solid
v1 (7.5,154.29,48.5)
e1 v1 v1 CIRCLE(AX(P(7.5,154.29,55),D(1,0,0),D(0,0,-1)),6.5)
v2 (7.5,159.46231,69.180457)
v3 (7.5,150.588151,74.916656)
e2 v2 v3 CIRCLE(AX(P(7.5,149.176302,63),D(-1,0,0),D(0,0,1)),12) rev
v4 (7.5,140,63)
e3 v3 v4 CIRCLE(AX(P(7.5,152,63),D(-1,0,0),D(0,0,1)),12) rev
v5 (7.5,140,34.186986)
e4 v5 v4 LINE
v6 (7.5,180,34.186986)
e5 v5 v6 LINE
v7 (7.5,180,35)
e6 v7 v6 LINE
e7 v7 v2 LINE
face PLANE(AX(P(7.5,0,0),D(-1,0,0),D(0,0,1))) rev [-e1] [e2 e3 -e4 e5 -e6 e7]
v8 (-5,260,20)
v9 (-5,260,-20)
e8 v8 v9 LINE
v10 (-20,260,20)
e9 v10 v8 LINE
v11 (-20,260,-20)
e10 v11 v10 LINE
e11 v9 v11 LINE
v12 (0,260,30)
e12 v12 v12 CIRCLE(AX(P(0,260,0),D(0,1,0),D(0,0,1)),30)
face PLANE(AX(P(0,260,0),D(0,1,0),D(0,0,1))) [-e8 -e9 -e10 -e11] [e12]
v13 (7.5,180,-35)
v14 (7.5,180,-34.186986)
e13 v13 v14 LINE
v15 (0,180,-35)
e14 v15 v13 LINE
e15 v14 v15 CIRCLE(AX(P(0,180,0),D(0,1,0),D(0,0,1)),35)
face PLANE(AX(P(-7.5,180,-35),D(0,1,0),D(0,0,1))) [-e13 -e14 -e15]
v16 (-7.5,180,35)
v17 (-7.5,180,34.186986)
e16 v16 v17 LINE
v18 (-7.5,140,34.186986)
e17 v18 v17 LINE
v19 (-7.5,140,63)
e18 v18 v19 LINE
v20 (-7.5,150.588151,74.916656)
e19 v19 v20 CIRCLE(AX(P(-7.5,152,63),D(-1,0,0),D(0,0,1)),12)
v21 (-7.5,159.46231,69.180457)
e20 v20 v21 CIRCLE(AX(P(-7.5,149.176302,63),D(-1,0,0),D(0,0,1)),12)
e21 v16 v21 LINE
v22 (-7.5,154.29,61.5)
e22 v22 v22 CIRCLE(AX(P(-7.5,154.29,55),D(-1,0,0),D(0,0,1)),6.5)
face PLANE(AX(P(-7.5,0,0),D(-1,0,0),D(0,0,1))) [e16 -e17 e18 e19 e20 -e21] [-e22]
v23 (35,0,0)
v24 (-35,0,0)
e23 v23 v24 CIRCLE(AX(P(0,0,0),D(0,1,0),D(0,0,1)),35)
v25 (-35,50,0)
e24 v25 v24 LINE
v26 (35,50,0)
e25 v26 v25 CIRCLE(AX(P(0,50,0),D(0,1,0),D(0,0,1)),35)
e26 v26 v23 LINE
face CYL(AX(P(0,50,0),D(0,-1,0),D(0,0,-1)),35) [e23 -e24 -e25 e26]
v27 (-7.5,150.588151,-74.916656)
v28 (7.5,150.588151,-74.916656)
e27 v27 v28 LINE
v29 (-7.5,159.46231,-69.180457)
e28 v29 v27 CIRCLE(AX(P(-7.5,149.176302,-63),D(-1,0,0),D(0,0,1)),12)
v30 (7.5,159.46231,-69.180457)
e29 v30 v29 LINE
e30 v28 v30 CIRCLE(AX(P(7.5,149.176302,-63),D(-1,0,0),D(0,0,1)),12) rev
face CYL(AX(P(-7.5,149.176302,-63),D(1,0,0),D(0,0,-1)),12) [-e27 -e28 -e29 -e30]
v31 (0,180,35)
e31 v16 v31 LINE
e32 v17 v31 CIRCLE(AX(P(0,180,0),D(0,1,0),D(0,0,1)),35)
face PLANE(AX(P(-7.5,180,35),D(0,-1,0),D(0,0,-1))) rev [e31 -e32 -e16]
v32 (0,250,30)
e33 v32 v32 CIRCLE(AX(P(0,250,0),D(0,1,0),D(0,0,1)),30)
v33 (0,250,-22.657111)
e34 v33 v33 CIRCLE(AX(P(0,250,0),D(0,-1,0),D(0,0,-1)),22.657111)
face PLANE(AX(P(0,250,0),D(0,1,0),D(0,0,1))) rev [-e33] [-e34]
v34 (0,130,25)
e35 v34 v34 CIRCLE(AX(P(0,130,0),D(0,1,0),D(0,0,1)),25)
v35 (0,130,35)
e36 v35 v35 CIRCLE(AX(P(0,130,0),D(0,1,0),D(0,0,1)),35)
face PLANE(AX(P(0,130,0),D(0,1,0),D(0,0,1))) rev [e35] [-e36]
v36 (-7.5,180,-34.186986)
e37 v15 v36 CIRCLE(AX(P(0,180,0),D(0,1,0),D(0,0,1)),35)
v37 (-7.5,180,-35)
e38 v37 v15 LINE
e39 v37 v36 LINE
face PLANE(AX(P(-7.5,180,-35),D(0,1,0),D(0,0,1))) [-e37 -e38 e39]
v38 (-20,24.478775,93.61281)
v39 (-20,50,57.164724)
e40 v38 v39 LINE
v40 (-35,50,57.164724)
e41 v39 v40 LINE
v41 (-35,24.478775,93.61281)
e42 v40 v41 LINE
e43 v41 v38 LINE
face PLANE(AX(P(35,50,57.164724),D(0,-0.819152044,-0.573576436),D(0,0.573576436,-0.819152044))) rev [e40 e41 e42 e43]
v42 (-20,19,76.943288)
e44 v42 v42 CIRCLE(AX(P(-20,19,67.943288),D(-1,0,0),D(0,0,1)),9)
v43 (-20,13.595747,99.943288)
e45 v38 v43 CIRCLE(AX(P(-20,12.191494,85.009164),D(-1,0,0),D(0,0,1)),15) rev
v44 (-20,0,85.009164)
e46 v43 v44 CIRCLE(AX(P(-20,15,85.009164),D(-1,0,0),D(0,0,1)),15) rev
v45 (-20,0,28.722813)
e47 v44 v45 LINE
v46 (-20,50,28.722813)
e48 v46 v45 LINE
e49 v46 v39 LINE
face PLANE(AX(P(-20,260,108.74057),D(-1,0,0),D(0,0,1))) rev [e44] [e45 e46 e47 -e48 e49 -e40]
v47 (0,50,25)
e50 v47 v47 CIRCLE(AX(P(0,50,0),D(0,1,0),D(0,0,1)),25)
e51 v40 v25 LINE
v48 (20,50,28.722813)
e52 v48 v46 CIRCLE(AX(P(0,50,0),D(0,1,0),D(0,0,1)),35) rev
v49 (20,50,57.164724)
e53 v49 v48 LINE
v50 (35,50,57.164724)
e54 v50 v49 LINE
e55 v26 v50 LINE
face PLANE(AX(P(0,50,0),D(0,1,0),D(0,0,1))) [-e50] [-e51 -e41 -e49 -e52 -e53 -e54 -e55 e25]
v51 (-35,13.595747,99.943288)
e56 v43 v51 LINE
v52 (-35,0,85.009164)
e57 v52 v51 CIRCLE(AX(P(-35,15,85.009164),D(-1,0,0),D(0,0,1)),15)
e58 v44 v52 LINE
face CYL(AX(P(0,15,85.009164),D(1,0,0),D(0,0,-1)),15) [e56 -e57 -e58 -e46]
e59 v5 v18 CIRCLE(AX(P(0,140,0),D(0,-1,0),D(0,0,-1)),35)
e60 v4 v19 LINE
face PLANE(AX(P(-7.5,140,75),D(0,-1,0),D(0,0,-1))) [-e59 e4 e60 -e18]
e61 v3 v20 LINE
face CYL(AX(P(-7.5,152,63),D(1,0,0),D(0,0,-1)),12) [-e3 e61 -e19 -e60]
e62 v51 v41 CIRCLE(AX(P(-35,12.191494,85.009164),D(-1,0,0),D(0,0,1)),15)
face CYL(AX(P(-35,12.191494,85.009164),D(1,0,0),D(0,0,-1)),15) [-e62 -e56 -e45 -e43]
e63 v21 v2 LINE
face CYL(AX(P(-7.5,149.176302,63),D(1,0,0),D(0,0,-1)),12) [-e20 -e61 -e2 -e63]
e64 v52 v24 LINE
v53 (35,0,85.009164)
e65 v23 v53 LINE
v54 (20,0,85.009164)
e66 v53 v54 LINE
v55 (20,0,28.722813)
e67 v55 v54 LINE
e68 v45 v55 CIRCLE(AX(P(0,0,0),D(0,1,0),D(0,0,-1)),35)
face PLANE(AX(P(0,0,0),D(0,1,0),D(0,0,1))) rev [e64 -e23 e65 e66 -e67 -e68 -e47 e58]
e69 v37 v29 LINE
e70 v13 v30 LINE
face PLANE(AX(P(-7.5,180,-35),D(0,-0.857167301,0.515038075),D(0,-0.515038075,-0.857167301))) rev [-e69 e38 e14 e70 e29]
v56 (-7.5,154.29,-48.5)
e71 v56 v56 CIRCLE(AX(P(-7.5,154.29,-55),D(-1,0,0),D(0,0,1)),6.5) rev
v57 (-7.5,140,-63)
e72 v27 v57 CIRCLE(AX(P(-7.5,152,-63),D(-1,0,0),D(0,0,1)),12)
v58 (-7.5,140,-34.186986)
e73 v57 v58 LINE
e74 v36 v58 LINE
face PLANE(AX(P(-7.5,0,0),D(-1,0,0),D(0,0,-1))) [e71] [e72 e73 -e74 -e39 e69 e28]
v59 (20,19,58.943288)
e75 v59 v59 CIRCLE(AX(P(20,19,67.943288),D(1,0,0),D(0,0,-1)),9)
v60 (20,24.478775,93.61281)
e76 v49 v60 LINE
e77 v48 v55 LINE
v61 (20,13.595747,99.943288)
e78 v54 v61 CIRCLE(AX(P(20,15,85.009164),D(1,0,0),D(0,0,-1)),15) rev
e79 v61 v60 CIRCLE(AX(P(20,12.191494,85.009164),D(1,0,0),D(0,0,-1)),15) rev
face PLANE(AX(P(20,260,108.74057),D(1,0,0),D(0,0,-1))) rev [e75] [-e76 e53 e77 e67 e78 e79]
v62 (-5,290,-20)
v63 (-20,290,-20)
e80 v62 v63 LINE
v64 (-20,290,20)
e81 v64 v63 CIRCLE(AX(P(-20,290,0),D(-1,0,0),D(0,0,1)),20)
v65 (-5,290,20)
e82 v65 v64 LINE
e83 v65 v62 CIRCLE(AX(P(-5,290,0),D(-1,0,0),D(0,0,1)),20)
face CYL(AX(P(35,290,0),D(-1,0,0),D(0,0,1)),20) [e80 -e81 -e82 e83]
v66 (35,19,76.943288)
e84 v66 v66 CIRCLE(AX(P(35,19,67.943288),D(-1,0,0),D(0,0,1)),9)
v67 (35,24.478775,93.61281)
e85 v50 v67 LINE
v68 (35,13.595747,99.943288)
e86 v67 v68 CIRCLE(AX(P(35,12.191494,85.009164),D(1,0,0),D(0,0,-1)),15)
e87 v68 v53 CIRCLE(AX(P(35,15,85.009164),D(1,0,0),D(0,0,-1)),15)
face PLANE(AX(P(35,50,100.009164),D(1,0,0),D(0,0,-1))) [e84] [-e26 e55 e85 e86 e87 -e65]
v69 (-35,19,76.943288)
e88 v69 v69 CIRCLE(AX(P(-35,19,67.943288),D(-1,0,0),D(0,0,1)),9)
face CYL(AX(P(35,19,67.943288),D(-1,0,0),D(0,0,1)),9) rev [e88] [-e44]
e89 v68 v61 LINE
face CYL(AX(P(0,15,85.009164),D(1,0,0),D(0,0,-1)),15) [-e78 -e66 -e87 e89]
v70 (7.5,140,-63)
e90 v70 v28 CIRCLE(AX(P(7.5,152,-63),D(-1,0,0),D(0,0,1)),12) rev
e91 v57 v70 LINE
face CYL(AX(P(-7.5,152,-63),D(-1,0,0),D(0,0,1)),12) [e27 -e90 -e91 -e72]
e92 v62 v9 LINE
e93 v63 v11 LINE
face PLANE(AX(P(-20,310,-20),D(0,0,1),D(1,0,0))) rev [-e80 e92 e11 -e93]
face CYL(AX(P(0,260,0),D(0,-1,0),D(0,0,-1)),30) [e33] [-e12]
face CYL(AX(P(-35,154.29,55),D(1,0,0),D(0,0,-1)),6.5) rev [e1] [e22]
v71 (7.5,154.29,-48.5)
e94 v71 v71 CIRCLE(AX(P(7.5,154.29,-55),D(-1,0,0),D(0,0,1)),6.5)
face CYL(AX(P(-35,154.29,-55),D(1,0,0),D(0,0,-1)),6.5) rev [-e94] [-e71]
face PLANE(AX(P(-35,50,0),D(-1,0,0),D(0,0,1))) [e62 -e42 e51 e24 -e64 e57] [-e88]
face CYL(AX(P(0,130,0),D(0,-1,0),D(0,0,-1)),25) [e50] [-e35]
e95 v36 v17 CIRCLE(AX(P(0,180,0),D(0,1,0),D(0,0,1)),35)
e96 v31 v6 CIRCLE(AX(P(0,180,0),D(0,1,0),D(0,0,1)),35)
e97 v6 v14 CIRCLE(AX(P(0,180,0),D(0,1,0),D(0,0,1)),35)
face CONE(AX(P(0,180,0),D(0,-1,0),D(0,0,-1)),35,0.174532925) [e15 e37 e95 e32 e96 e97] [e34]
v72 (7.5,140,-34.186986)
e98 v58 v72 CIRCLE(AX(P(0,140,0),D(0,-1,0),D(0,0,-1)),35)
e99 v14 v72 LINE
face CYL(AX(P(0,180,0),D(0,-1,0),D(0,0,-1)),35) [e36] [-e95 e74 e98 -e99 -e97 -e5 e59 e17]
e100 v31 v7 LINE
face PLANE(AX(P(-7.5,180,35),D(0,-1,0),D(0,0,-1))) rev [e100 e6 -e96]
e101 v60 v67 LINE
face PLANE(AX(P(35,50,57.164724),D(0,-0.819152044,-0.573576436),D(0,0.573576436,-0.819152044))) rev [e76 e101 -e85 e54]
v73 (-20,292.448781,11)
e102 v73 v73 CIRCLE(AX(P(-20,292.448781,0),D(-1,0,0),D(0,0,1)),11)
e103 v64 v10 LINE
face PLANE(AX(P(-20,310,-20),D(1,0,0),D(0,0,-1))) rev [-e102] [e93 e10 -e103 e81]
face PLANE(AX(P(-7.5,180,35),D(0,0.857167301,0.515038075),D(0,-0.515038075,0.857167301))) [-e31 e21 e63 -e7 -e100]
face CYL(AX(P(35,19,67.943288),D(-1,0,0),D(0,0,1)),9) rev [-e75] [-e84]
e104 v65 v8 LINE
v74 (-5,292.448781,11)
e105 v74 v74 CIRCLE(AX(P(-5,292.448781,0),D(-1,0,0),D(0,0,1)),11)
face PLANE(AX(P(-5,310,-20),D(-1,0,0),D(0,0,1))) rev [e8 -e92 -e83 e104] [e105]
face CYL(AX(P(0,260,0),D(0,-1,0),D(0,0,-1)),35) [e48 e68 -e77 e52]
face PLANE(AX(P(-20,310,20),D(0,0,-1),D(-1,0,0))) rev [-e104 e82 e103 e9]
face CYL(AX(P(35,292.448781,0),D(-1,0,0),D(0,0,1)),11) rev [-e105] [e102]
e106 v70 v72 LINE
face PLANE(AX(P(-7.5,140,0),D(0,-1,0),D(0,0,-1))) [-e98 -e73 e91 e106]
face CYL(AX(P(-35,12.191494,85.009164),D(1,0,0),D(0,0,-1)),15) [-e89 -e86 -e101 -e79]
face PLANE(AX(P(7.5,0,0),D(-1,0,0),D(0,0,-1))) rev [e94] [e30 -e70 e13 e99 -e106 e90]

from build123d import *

# Parameters (mm, degrees)
SKETCH1_R           = 35
BOSS_EXTRUDE1_DEPTH = 50
SKETCH6_R           = 25
BOSS_EXTRUDE2_DEPTH = 80
SKETCH7_R           = 35
BOSS_EXTRUDE3_DEPTH = 50
SKETCH10_R          = 30
BOSS_EXTRUDE5_DEPTH = 10
SKETCH12_W          = 70
SKETCH12_H          = 100.009163948
BOSS_EXTRUDE6_DEPTH = 50
CUT_EXTRUDE1_DEPTH  = 288.231322933
CUT_EXTRUDE2_DEPTH  = 281.761166962
FILLET1_R           = 15
SKETCH15_R          = 9
CUT_EXTRUDE3_DEPTH  = 288.208392811
BOSS_EXTRUDE8_DEPTH = 7.5
FILLET2_R           = 12
SKETCH17_R          = 6.5
CUT_EXTRUDE4_DEPTH  = 282.771025659
FILLET3_R           = 12
SKETCH18_W          = 15
SKETCH18_H          = 40
BOSS_EXTRUDE9_DEPTH = 50
CUT_EXTRUDE5_DEPTH  = 331.323570005
SKETCH20_R          = 11
CUT_EXTRUDE6_DEPTH  = 331.323570005


with BuildPart() as part:
    # Sketch1 → Boss-Extrude1 (new body)
    with BuildSketch(Plane(origin=(0, 0, 0), x_dir=(1, 0, 0), z_dir=(0, 1, 0))):
        with Locations(Location((0, 0, 0), (0, 0, 270))):
            Circle(SKETCH1_R)
    extrude(amount=BOSS_EXTRUDE1_DEPTH)

    # Sketch6 → Boss-Extrude2 (add)
    with BuildSketch(Plane(origin=(0, 50, 0), x_dir=(1, 0, 0), z_dir=(0, 1, 0))):
        with Locations(Location((0, 0, 0), (0, 0, 270))):
            Circle(SKETCH6_R)
    extrude(amount=BOSS_EXTRUDE2_DEPTH)

    # Sketch7 → Boss-Extrude3 (add)
    with BuildSketch(Plane(origin=(0, 130, 0), x_dir=(1, 0, 0), z_dir=(0, 1, 0))):
        with Locations(Location((0, 0, 0), (0, 0, 270))):
            Circle(SKETCH7_R)
    extrude(amount=BOSS_EXTRUDE3_DEPTH)



with BuildPart() as body_2:
    # Sketch10 → Boss-Extrude5 (new body)
    with BuildSketch(Plane(origin=(0, 250, 0), x_dir=(1, 0, 0), z_dir=(0, 1, 0))):
        with Locations(Location((0, 0, 0), (0, 0, 270))):
            Circle(SKETCH10_R)
    extrude(amount=BOSS_EXTRUDE5_DEPTH)


with BuildPart() as part_1:
    add(part.part)

    add(body_2.part)  # Revolve1 merges body 2
    # Sketch11 → Revolve1 (revolve)
    with BuildSketch(Plane(origin=(0, 0, 0), x_dir=(0, 0, -1), z_dir=(1, 0, 0))):
        Polygon((0, 250), (22.65711135, 250), (35, 180), (0, 180), align=None)
    revolve(axis=Axis((0, 180, 0), (0, 1, 0)))

    # Sketch12 → Boss-Extrude6 (add)
    with BuildSketch(Plane.XZ):
        with Locations((0, 50.004581974)):
            Rectangle(SKETCH12_W, SKETCH12_H)
    extrude(amount=-BOSS_EXTRUDE6_DEPTH)

    # Sketch13 → Cut-Extrude1 (cut, through all)
    with BuildSketch(Plane.ZY.offset(35)):
        Polygon((57.164723746, 50), (100.009163948, 20), (100.009163948, 50), align=None)
    extrude(amount=-CUT_EXTRUDE1_DEPTH, mode=Mode.SUBTRACT)

    # Sketch14 → Cut-Extrude2 (cut, through all)
    with BuildSketch(Plane.XZ):
        with BuildLine():
            Line((-20, 108.740570097), (20, 108.740570097))
            Line((20, 108.740570097), (20, 28.722813233))
            ThreePointArc((20, 28.722813233), (0, 35), (-20, 28.722813233))
            Line((-20, 28.722813233), (-20, 108.740570097))
        make_face()
    extrude(amount=-CUT_EXTRUDE2_DEPTH, mode=Mode.SUBTRACT)

    # Fillet1
    # the kernel refuses this fillet: 15 mm, written as the material it takes off along each edge
    with BuildSketch(Plane(origin=(-17.5, 0, 100.009163948), x_dir=(0, 0, -1), z_dir=(1, 0, 0)), Plane(origin=(-72.5, 0, 100.009163948), x_dir=(0, 0, -1), z_dir=(1, 0, 0))) as fillet1_piece_1:
        with BuildLine():
            CenterArc((FILLET1_R, FILLET1_R), FILLET1_R, 180, 90)
            Line((0, FILLET1_R), (0, 0))
            Line((0, 0), (FILLET1_R, 0))
        make_face()
    extrude(amount=90, mode=Mode.SUBTRACT)
    with BuildSketch(Plane(origin=(0.478735604, 20, 100.009163948), x_dir=(0, -1, 0), z_dir=(1, 0, 0)), Plane(origin=(-54.521264396, 20, 100.009163948), x_dir=(0, -1, 0), z_dir=(1, 0, 0))) as fillet1_piece_2:
        with BuildLine():
            CenterArc((FILLET1_R * 0.520567050552, FILLET1_R), FILLET1_R, 215, 55)
            Line((-FILLET1_R * 0.298584993737, FILLET1_R * 0.426423563649), (0, 0))
            Line((0, 0), (FILLET1_R * 0.520567050552, 0))
        make_face()
    extrude(amount=54.042528791, mode=Mode.SUBTRACT)

    # Sketch15 → Cut-Extrude3 (cut, through all)
    with BuildSketch(Plane.ZY.offset(35)):
        with Locations((67.943288424, 19)):
            Circle(SKETCH15_R)
    extrude(amount=-CUT_EXTRUDE3_DEPTH, mode=Mode.SUBTRACT)

    # Sketch16 → Boss-Extrude8 (add, symmetric)
    with BuildSketch(Plane(origin=(0, 0, 0), x_dir=(0, 0, -1), z_dir=(1, 0, 0))):
        Polygon((-35, 180), (-75, 155.965575239), (-75, 140), (-35, 140), (0, 140), (0, 180), align=None)
    boss_extrude8 = extrude(amount=BOSS_EXTRUDE8_DEPTH, both=True)

    # Fillet2
    # the kernel refuses this fillet: 12 mm, written as the material it takes off along each edge
    with BuildSketch(Plane(origin=(-37.5, 140, 75), x_dir=(0, 0, -1), z_dir=(1, 0, 0))) as fillet2_piece_1:
        with BuildLine():
            CenterArc((FILLET2_R, FILLET2_R), FILLET2_R, 180, 90)
            Line((0, FILLET2_R), (0, 0))
            Line((0, 0), (FILLET2_R, 0))
        make_face()
    extrude(amount=75, mode=Mode.SUBTRACT)
    with BuildSketch(Plane(origin=(-24.473183346, 155.965575239, 75), x_dir=(0, 0.5150380749100483, -0.8571673007021159), z_dir=(1, 0, 0))) as fillet2_piece_2:
        with BuildLine():
            CenterArc((FILLET2_R * 0.565772778188, -FILLET2_R), FILLET2_R, 90, 59)
            Line((-FILLET2_R * 0.291394522514, -FILLET2_R * 0.48496192509), (0, 0))
            Line((0, 0), (FILLET2_R * 0.565772778188, 0))
        make_face()
    extrude(amount=48.946366691, mode=Mode.SUBTRACT)

    # Sketch17 → Cut-Extrude4 (cut, through all)
    with BuildSketch(Plane(origin=(7.5, 0, 0), x_dir=(0, 0, -1), z_dir=(1, 0, 0))):
        with Locations((-55, 154.29)):
            Circle(SKETCH17_R)
    cut_extrude4 = extrude(amount=-CUT_EXTRUDE4_DEPTH, mode=Mode.SUBTRACT)

    # Mirror1: Boss-Extrude8 across plane
    add(boss_extrude8.mirror(Plane.XY))

    # Fillet3
    # the kernel refuses this fillet: 12 mm, written as the material it takes off along each edge
    with BuildSketch(Plane(origin=(-37.5, 140, -75), x_dir=(0, 0, 1), z_dir=(1, 0, 0))) as fillet3_piece_1:
        with BuildLine():
            CenterArc((FILLET3_R, -FILLET3_R), FILLET3_R, 90, 90)
            Line((0, -FILLET3_R), (0, 0))
            Line((0, 0), (FILLET3_R, 0))
        make_face()
    extrude(amount=75, mode=Mode.SUBTRACT)
    with BuildSketch(Plane(origin=(-24.473183346, 155.965575239, -75), x_dir=(0, 0.5150380749100483, 0.8571673007021159), z_dir=(1, 0, 0))) as fillet3_piece_2:
        with BuildLine():
            CenterArc((FILLET3_R * 0.565772778188, FILLET3_R), FILLET3_R, 211, 59)
            Line((-FILLET3_R * 0.291394522514, FILLET3_R * 0.48496192509), (0, 0))
            Line((0, 0), (FILLET3_R * 0.565772778188, 0))
        make_face()
    extrude(amount=48.946366691, mode=Mode.SUBTRACT)

    # Mirror2: Cut-Extrude4 across plane
    add(cut_extrude4.mirror(Plane.XY), mode=Mode.SUBTRACT)

    # Sketch18 → Boss-Extrude9 (add)
    with BuildSketch(Plane(origin=(0, 260, 0), x_dir=(1, 0, 0), z_dir=(0, 1, 0))):
        with Locations((-12.5, 0)):
            Rectangle(SKETCH18_W, SKETCH18_H)
    extrude(amount=BOSS_EXTRUDE9_DEPTH)

    # Sketch19 → Cut-Extrude5 (cut, through all)
    with BuildSketch(Plane.ZY.offset(20)):
        with BuildLine():
            Line((20, 310), (-1.45e-07, 310))
            ThreePointArc((-1.45e-07, 310), (14.142135572, 304.142135675), (20, 290))
            Line((20, 290), (20, 310))
        make_face()
        with BuildLine():
            Line((-20, 310), (-20, 290))
            ThreePointArc((-20, 290), (-14.142135675, 304.142135572), (-1.45e-07, 310))
            Line((-1.45e-07, 310), (-20, 310))
        make_face()
    extrude(amount=-CUT_EXTRUDE5_DEPTH, mode=Mode.SUBTRACT)

    # Sketch20 → Cut-Extrude6 (cut, through all)
    with BuildSketch(Plane.ZY.offset(20)):
        with Locations((0, 292.448780647)):
            Circle(SKETCH20_R)
    extrude(amount=-CUT_EXTRUDE6_DEPTH, mode=Mode.SUBTRACT)


solid = part_1.part
